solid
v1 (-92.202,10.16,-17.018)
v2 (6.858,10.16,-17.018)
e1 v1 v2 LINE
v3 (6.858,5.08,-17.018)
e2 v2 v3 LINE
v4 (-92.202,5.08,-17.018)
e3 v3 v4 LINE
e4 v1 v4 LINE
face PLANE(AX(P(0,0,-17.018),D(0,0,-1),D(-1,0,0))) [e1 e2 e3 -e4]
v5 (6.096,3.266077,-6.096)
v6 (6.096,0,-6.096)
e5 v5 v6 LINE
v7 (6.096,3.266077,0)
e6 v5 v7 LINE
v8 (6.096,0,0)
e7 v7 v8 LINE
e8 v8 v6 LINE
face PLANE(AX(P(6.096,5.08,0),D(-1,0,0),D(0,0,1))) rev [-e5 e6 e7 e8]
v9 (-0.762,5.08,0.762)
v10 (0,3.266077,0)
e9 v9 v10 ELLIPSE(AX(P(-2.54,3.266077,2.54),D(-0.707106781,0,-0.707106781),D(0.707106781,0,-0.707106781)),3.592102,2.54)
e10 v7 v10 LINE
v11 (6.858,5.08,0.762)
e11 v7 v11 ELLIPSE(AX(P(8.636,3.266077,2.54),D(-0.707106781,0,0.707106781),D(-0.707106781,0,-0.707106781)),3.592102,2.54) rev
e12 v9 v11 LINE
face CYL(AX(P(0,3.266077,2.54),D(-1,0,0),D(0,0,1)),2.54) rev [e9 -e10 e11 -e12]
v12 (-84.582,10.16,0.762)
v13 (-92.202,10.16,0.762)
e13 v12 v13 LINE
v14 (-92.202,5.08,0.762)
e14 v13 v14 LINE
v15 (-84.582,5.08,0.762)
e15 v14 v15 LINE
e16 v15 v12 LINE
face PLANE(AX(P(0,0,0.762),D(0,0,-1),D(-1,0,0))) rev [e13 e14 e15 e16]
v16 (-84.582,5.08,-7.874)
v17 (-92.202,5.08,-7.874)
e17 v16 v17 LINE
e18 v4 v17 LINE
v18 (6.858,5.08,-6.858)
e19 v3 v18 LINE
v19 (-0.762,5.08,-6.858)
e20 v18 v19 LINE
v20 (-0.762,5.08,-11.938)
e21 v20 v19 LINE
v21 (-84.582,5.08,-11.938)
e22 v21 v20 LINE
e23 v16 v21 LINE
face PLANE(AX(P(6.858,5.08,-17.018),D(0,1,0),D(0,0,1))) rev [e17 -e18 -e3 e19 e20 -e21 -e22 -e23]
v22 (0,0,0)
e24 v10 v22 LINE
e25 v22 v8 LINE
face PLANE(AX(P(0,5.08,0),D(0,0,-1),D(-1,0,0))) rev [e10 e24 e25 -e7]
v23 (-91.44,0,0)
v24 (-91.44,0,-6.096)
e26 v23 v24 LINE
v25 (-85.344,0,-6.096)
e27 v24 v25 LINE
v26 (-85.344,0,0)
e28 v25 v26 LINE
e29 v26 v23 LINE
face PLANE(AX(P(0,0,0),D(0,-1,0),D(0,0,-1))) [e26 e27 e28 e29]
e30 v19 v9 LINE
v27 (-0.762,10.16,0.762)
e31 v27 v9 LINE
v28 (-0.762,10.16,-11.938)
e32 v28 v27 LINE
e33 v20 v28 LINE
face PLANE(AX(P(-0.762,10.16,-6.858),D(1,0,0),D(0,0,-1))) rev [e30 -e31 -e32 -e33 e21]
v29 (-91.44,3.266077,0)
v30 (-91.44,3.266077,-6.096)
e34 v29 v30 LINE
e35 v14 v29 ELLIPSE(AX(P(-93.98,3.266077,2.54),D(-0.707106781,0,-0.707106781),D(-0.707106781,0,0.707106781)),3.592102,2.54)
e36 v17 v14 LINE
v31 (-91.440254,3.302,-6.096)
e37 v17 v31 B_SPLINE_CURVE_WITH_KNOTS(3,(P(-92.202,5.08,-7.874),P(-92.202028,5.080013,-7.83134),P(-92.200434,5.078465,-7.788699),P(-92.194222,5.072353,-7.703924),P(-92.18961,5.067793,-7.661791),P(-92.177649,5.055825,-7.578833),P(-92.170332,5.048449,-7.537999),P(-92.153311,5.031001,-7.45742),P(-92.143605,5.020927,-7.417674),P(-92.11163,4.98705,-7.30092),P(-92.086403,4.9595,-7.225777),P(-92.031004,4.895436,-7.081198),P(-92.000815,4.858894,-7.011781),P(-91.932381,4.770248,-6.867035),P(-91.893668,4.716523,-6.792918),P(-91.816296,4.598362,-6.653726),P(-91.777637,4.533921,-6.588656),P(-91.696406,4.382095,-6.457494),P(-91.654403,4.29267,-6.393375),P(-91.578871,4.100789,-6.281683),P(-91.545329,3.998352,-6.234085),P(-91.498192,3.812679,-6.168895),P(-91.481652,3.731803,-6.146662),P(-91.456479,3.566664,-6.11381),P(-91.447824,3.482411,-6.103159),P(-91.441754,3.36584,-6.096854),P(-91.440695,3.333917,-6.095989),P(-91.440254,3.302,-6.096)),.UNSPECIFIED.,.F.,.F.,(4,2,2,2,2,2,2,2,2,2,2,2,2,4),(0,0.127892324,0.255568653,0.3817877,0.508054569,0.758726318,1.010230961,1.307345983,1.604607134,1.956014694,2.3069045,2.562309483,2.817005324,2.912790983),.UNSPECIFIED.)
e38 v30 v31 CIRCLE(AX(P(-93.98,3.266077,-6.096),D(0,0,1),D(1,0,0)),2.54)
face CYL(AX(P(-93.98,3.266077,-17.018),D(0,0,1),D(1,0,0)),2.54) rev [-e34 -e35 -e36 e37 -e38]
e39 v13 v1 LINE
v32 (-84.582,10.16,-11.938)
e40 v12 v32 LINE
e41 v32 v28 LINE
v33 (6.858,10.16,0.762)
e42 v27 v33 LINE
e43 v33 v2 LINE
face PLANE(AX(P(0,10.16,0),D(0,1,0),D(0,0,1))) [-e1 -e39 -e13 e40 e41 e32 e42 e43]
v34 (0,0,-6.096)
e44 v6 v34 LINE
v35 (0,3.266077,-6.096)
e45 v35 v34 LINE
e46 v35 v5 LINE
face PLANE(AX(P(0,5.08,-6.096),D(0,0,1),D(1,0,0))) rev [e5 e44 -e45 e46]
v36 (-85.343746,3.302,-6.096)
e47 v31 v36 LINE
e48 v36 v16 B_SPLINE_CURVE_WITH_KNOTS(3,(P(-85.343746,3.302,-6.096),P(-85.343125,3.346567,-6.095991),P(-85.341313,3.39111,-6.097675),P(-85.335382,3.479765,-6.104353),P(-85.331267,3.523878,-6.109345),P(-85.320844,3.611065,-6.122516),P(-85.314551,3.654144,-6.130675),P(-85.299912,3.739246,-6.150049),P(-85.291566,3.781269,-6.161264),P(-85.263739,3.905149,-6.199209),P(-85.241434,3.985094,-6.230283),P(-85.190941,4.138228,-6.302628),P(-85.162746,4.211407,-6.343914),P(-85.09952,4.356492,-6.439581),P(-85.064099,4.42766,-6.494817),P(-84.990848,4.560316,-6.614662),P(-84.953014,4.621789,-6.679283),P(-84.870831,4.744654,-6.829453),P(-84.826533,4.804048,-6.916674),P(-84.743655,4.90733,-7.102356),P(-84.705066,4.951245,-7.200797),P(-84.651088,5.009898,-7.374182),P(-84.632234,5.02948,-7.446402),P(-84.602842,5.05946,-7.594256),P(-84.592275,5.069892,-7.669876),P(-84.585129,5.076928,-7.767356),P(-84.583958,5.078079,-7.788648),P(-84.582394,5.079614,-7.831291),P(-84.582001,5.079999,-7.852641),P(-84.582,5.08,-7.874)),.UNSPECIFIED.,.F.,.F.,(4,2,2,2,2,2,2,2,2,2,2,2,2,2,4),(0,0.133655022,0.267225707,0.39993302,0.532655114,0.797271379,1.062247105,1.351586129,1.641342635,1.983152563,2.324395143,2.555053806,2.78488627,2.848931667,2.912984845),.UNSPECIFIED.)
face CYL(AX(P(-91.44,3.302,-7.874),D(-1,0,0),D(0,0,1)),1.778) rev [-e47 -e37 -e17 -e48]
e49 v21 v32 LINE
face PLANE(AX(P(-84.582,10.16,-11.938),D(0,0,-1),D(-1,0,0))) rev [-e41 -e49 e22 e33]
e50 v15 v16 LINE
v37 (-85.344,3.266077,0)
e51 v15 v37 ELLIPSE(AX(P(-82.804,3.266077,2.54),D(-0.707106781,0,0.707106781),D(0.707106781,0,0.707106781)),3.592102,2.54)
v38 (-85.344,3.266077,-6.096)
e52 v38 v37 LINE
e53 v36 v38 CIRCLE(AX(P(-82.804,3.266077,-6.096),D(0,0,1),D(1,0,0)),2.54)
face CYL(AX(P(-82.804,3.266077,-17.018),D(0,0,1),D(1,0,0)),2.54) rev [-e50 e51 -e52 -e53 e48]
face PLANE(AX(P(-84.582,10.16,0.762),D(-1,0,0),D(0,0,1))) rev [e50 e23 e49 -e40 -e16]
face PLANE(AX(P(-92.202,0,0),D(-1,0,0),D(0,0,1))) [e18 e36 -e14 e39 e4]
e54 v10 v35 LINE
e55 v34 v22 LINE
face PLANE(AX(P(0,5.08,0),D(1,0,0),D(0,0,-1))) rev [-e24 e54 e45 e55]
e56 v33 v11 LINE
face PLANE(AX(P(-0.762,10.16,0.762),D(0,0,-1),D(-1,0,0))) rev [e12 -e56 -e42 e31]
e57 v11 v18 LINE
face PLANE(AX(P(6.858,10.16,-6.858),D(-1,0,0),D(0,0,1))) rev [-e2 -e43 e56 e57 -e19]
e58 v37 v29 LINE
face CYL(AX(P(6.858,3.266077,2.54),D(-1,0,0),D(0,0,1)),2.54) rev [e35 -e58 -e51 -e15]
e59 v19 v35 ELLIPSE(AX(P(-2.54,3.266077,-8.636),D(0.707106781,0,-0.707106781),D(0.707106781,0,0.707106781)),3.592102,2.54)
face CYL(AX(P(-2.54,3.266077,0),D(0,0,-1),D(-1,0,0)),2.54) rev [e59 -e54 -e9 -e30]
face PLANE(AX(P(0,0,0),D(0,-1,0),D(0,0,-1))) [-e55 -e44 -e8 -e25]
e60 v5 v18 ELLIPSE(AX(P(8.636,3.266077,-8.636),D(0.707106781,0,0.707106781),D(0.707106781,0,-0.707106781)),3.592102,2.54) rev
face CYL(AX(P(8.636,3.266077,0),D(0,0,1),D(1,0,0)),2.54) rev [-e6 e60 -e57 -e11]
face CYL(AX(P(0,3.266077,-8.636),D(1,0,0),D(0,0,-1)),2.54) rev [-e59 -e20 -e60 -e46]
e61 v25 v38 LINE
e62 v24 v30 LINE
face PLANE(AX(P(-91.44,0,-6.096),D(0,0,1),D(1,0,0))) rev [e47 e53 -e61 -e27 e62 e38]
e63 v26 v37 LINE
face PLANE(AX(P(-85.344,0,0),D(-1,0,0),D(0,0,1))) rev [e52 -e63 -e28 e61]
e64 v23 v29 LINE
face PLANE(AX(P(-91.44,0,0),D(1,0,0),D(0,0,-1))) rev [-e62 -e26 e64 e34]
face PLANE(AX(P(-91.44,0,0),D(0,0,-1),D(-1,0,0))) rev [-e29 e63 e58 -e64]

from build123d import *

# Parameters (mm, degrees)
SKETCH1_W           = 6.096
SKETCH1_H           = 6.096
BOSS_EXTRUDE1_DEPTH = 5.08
SKETCH2_W           = 7.62
SKETCH2_H           = 7.62
BOSS_EXTRUDE2_DEPTH = 5.08
FILLET1_R           = 2.54
SKETCH3_W           = 7.62
SKETCH3_H           = 5.08
BOSS_EXTRUDE3_DEPTH = 10.16
SKETCH4_W           = 5.08
SKETCH4_H           = 5.08
BOSS_EXTRUDE4_DEPTH = 83.82
SKETCH6_W           = 5.08
SKETCH6_H           = 5.08
BOSS_EXTRUDE5_DEPTH = 7.62
SKETCH8_W           = 7.62
SKETCH8_H           = 5.08
BOSS_EXTRUDE6_DEPTH = 12.7
SKETCH9_W           = 6.096
SKETCH9_H           = 6.096
BOSS_EXTRUDE7_DEPTH = 5.08
FILLET7_R           = 2.54
FILLET8_R           = 2.54
FILLET9_R           = 2.54
FILLET11_R          = 1.778


with BuildPart() as part:
    # Sketch1 → Boss-Extrude1 (new body)
    with BuildSketch(Plane(origin=(0, 0, 0), x_dir=(1, 0, 0), z_dir=(0, 1, 0))):
        with Locations((3.048, 3.048)):
            Rectangle(SKETCH1_W, SKETCH1_H)
    extrude(amount=BOSS_EXTRUDE1_DEPTH)

    # Sketch2 → Boss-Extrude2 (add)
    with BuildSketch(Plane(origin=(0, 5.08, 0), x_dir=(1, 0, 0), z_dir=(0, 1, 0))):
        with Locations((3.048, 3.048)):
            Rectangle(SKETCH2_W, SKETCH2_H)
    extrude(amount=BOSS_EXTRUDE2_DEPTH)

    # Fillet1
    # the kernel refuses this fillet: 2.54 mm, written as the material it adds along each edge
    with BuildSketch(Plane(origin=(6.096, 5.08, 0), x_dir=(1, 0, 0), z_dir=(0, 0, -1)), Plane(origin=(6.096, 5.08, -6.096), x_dir=(0, 0, -1), z_dir=(-1, 0, 0)), Plane(origin=(0, 5.08, -6.096), x_dir=(-1, 0, 0), z_dir=(0, 0, 1)), Plane(origin=(0, 5.08, 0), x_dir=(0, 0, 1), z_dir=(1, 0, 0))) as fillet1_piece_1:
        with BuildLine():
            CenterArc((2.54, 1.813922821), FILLET1_R, 180, 45.572995999)
            Line((0, 1.813922821), (-0.0508, 1.813922821))
            Line((-0.0508, 1.813922821), (-0.0508, 0))
            Line((-0.0508, 0), (0, -0.0508))
            ThreePointArc((0, -0.0508), (0.381, -0.0508), (0.72644, -0.036278456))
            Line((0.72644, -0.036278456), (0.762, 0))
        make_face()
    extrude(amount=6.096)
    with BuildSketch(Plane(origin=(6.096, 5.08, 4.534807052), x_dir=(1, 0, 0), z_dir=(0, 0, -1))) as fillet1_piece_2a_section:
        with BuildLine():
            CenterArc((2.54, 1.813922821), FILLET1_R, 180, 45.572995999)
            Line((0, 1.813922821), (-0.0508, 1.813922821))
            Line((-0.0508, 1.813922821), (-0.0508, 0))
            Line((-0.0508, 0), (0, -0.0508))
            ThreePointArc((0, -0.0508), (0.381, -0.0508), (0.72644, -0.036278456))
            Line((0.72644, -0.036278456), (0.762, 0))
        make_face()
    fillet1_piece_2a = extrude(amount=10.630807052, mode=Mode.PRIVATE)
    fillet1_piece_2a = split(fillet1_piece_2a, bisect_by=Plane(origin=(6.284412047, 4.594869389, 0.762), z_dir=(0, 0, -1)), keep=Keep.TOP, mode=Mode.PRIVATE)
    fillet1_piece_2a = split(fillet1_piece_2a, bisect_by=Plane(origin=(6.284412047, 4.594869389, 0), z_dir=(0, 0, 1)), keep=Keep.TOP, mode=Mode.PRIVATE)
    with BuildSketch(Plane(origin=(0, 5.08, 0), x_dir=(0, 0, 1), z_dir=(1, 0, 0))) as fillet1_piece_2b_section:
        with BuildLine():
            CenterArc((2.54, 1.813922821), FILLET1_R, 180, 45.572995999)
            Line((0, 1.813922821), (-0.0508, 1.813922821))
            Line((-0.0508, 1.813922821), (-0.0508, 0))
            Line((-0.0508, 0), (0, -0.0508))
            ThreePointArc((0, -0.0508), (0.381, -0.0508), (0.72644, -0.036278456))
            Line((0.72644, -0.036278456), (0.762, 0))
        make_face()
    fillet1_piece_2b = extrude(amount=10.630807052, mode=Mode.PRIVATE)
    fillet1_piece_2b = split(fillet1_piece_2b, bisect_by=Plane(origin=(6.858, 4.594869389, 0.188412047), z_dir=(-1, 0, 0)), keep=Keep.TOP, mode=Mode.PRIVATE)
    fillet1_piece_2b = split(fillet1_piece_2b, bisect_by=Plane(origin=(6.096, 4.594869389, 0.188412047), z_dir=(1, 0, 0)), keep=Keep.TOP, mode=Mode.PRIVATE)
    fillet1_piece_2 = fillet1_piece_2a & fillet1_piece_2b
    add(fillet1_piece_2)
    with BuildSketch(Plane(origin=(10.630807052, 5.08, -6.096), x_dir=(0, 0, -1), z_dir=(-1, 0, 0))) as fillet1_piece_3a_section:
        with BuildLine():
            CenterArc((2.54, 1.813922821), FILLET1_R, 180, 45.572995999)
            Line((0, 1.813922821), (-0.0508, 1.813922821))
            Line((-0.0508, 1.813922821), (-0.0508, 0))
            Line((-0.0508, 0), (0, -0.0508))
            ThreePointArc((0, -0.0508), (0.381, -0.0508), (0.72644, -0.036278456))
            Line((0.72644, -0.036278456), (0.762, 0))
        make_face()
    fillet1_piece_3a = extrude(amount=10.630807052, mode=Mode.PRIVATE)
    fillet1_piece_3a = split(fillet1_piece_3a, bisect_by=Plane(origin=(6.858, 4.594869389, -6.284412047), z_dir=(-1, 0, 0)), keep=Keep.TOP, mode=Mode.PRIVATE)
    fillet1_piece_3a = split(fillet1_piece_3a, bisect_by=Plane(origin=(6.096, 4.594869389, -6.284412047), z_dir=(1, 0, 0)), keep=Keep.TOP, mode=Mode.PRIVATE)
    with BuildSketch(Plane(origin=(6.096, 5.08, 0), x_dir=(1, 0, 0), z_dir=(0, 0, -1))) as fillet1_piece_3b_section:
        with BuildLine():
            CenterArc((2.54, 1.813922821), FILLET1_R, 180, 45.572995999)
            Line((0, 1.813922821), (-0.0508, 1.813922821))
            Line((-0.0508, 1.813922821), (-0.0508, 0))
            Line((-0.0508, 0), (0, -0.0508))
            ThreePointArc((0, -0.0508), (0.381, -0.0508), (0.72644, -0.036278456))
            Line((0.72644, -0.036278456), (0.762, 0))
        make_face()
    fillet1_piece_3b = extrude(amount=10.630807052, mode=Mode.PRIVATE)
    fillet1_piece_3b = split(fillet1_piece_3b, bisect_by=Plane(origin=(6.284412047, 4.594869389, -6.858), z_dir=(0, 0, 1)), keep=Keep.TOP, mode=Mode.PRIVATE)
    fillet1_piece_3b = split(fillet1_piece_3b, bisect_by=Plane(origin=(6.284412047, 4.594869389, -6.096), z_dir=(0, 0, -1)), keep=Keep.TOP, mode=Mode.PRIVATE)
    fillet1_piece_3 = fillet1_piece_3a & fillet1_piece_3b
    add(fillet1_piece_3)
    with BuildSketch(Plane(origin=(0, 5.08, -10.630807052), x_dir=(-1, 0, 0), z_dir=(0, 0, 1))) as fillet1_piece_4a_section:
        with BuildLine():
            CenterArc((2.54, 1.813922821), FILLET1_R, 180, 45.572995999)
            Line((0, 1.813922821), (-0.0508, 1.813922821))
            Line((-0.0508, 1.813922821), (-0.0508, 0))
            Line((-0.0508, 0), (0, -0.0508))
            ThreePointArc((0, -0.0508), (0.381, -0.0508), (0.72644, -0.036278456))
            Line((0.72644, -0.036278456), (0.762, 0))
        make_face()
    fillet1_piece_4a = extrude(amount=10.630807052, mode=Mode.PRIVATE)
    fillet1_piece_4a = split(fillet1_piece_4a, bisect_by=Plane(origin=(-0.188412047, 4.594869389, -6.858), z_dir=(0, 0, 1)), keep=Keep.TOP, mode=Mode.PRIVATE)
    fillet1_piece_4a = split(fillet1_piece_4a, bisect_by=Plane(origin=(-0.188412047, 4.594869389, -6.096), z_dir=(0, 0, -1)), keep=Keep.TOP, mode=Mode.PRIVATE)
    with BuildSketch(Plane(origin=(6.096, 5.08, -6.096), x_dir=(0, 0, -1), z_dir=(-1, 0, 0))) as fillet1_piece_4b_section:
        with BuildLine():
            CenterArc((2.54, 1.813922821), FILLET1_R, 180, 45.572995999)
            Line((0, 1.813922821), (-0.0508, 1.813922821))
            Line((-0.0508, 1.813922821), (-0.0508, 0))
            Line((-0.0508, 0), (0, -0.0508))
            ThreePointArc((0, -0.0508), (0.381, -0.0508), (0.72644, -0.036278456))
            Line((0.72644, -0.036278456), (0.762, 0))
        make_face()
    fillet1_piece_4b = extrude(amount=10.630807052, mode=Mode.PRIVATE)
    fillet1_piece_4b = split(fillet1_piece_4b, bisect_by=Plane(origin=(-0.762, 4.594869389, -6.284412047), z_dir=(1, 0, 0)), keep=Keep.TOP, mode=Mode.PRIVATE)
    fillet1_piece_4b = split(fillet1_piece_4b, bisect_by=Plane(origin=(0, 4.594869389, -6.284412047), z_dir=(-1, 0, 0)), keep=Keep.TOP, mode=Mode.PRIVATE)
    fillet1_piece_4 = fillet1_piece_4a & fillet1_piece_4b
    add(fillet1_piece_4)
    with BuildSketch(Plane(origin=(0, 5.08, -6.096), x_dir=(-1, 0, 0), z_dir=(0, 0, 1))) as fillet1_piece_5a_section:
        with BuildLine():
            CenterArc((2.54, 1.813922821), FILLET1_R, 180, 45.572995999)
            Line((0, 1.813922821), (-0.0508, 1.813922821))
            Line((-0.0508, 1.813922821), (-0.0508, 0))
            Line((-0.0508, 0), (0, -0.0508))
            ThreePointArc((0, -0.0508), (0.381, -0.0508), (0.72644, -0.036278456))
            Line((0.72644, -0.036278456), (0.762, 0))
        make_face()
    fillet1_piece_5a = extrude(amount=10.630807052, mode=Mode.PRIVATE)
    fillet1_piece_5a = split(fillet1_piece_5a, bisect_by=Plane(origin=(-0.188412047, 4.594869389, 0.762), z_dir=(0, 0, -1)), keep=Keep.TOP, mode=Mode.PRIVATE)
    fillet1_piece_5a = split(fillet1_piece_5a, bisect_by=Plane(origin=(-0.188412047, 4.594869389, 0), z_dir=(0, 0, 1)), keep=Keep.TOP, mode=Mode.PRIVATE)
    with BuildSketch(Plane(origin=(-4.534807052, 5.08, 0), x_dir=(0, 0, 1), z_dir=(1, 0, 0))) as fillet1_piece_5b_section:
        with BuildLine():
            CenterArc((2.54, 1.813922821), FILLET1_R, 180, 45.572995999)
            Line((0, 1.813922821), (-0.0508, 1.813922821))
            Line((-0.0508, 1.813922821), (-0.0508, 0))
            Line((-0.0508, 0), (0, -0.0508))
            ThreePointArc((0, -0.0508), (0.381, -0.0508), (0.72644, -0.036278456))
            Line((0.72644, -0.036278456), (0.762, 0))
        make_face()
    fillet1_piece_5b = extrude(amount=10.630807052, mode=Mode.PRIVATE)
    fillet1_piece_5b = split(fillet1_piece_5b, bisect_by=Plane(origin=(-0.762, 4.594869389, 0.188412047), z_dir=(1, 0, 0)), keep=Keep.TOP, mode=Mode.PRIVATE)
    fillet1_piece_5b = split(fillet1_piece_5b, bisect_by=Plane(origin=(0, 4.594869389, 0.188412047), z_dir=(-1, 0, 0)), keep=Keep.TOP, mode=Mode.PRIVATE)
    fillet1_piece_5 = fillet1_piece_5a & fillet1_piece_5b
    add(fillet1_piece_5)

    # Sketch3 → Boss-Extrude3 (add)
    with BuildSketch(Plane(origin=(0, 0, -6.858), x_dir=(-1, 0, 0), z_dir=(0, 0, -1))):
        with Locations((-3.048, 7.62)):
            Rectangle(SKETCH3_W, SKETCH3_H)
    extrude(amount=BOSS_EXTRUDE3_DEPTH)

    # Sketch4 → Boss-Extrude4 (add)
    with BuildSketch(Plane.ZY.offset(0.762)):
        with Locations((-14.478, 7.62)):
            Rectangle(SKETCH4_W, SKETCH4_H)
    extrude(amount=BOSS_EXTRUDE4_DEPTH)

    # Sketch6 → Boss-Extrude5 (add)
    with BuildSketch(Plane.ZY.offset(84.582)):
        with Locations((-14.478, 7.62)):
            Rectangle(SKETCH6_W, SKETCH6_H)
    extrude(amount=BOSS_EXTRUDE5_DEPTH)

    # Sketch8 → Boss-Extrude6 (add)
    with BuildSketch(Plane.XY.offset(-11.938)):
        with Locations((-88.392, 7.62)):
            Rectangle(SKETCH8_W, SKETCH8_H)
    extrude(amount=BOSS_EXTRUDE6_DEPTH)

    # Sketch9 → Boss-Extrude7 (add)
    with BuildSketch(Plane.XZ.offset(-5.08)):
        with Locations((-88.392, -3.048)):
            Rectangle(SKETCH9_W, SKETCH9_H)
    extrude(amount=BOSS_EXTRUDE7_DEPTH)

    # Fillet7
    # the kernel refuses this fillet: 2.54 mm, written as the material it adds along each edge
    with BuildSketch(Plane(origin=(-85.344, 5.08, 0), x_dir=(1, 0, 0), z_dir=(0, 0, -1))) as fillet7_piece_1:
        with BuildLine():
            CenterArc((2.54, 1.813922821), FILLET7_R, 180, 45.572995999)
            Line((0, 1.813922821), (-0.0508, 1.813922821))
            Line((-0.0508, 1.813922821), (-0.0508, 0))
            Line((-0.0508, 0), (0, -0.0508))
            ThreePointArc((0, -0.0508), (0.381, -0.0508), (0.72644, -0.036278456))
            Line((0.72644, -0.036278456), (0.762, 0))
        make_face()
    extrude(amount=6.096)

    # Fillet8
    # the kernel refuses this fillet: 2.54 mm, written as the material it adds along each edge
    with BuildSketch(Plane(origin=(-84.582, 5.08, 0), x_dir=(0, 0, 1), z_dir=(-1, 0, 0))) as fillet8_piece_1_section:
        with BuildLine():
            CenterArc((2.54, -1.813922821), FILLET8_R, 134.427004001, 45.572995999)
            Line((0, -1.813922821), (-0.0508, -1.813922821))
            Line((-0.0508, -1.813922821), (-0.0508, 0))
            Line((-0.0508, 0), (0, 0.0508))
            ThreePointArc((0, 0.0508), (0.381, 0.0508), (0.72644, 0.036278456))
            Line((0.72644, 0.036278456), (0.762, 0))
        make_face()
    fillet8_piece_1 = extrude(amount=6.858, mode=Mode.PRIVATE)
    fillet8_piece_1 = fillet8_piece_1 - Plane(origin=(-82.804, 3.266077179, 0.249051063), x_dir=(1, 0, 0), z_dir=(0, 0, 1)) * Cylinder(2.54, 21, mode=Mode.PRIVATE)
    add(fillet8_piece_1)

    # Fillet9
    # the kernel refuses this fillet: 2.54 mm, written as the material it adds along each edge
    with BuildSketch(Plane(origin=(-91.44, 5.08, 0.762), x_dir=(-1, 0, 0), z_dir=(0, 0, -1))) as fillet9_piece_1_section:
        with BuildLine():
            CenterArc((2.54, -1.813922821), FILLET9_R, 134.427004001, 45.572995999)
            Line((0, -1.813922821), (-0.0508, -1.813922821))
            Line((-0.0508, -1.813922821), (-0.0508, 0))
            Line((-0.0508, 0), (0, 0.0508))
            ThreePointArc((0, 0.0508), (0.381, 0.0508), (0.72644, 0.036278456))
            Line((0.72644, 0.036278456), (0.762, 0))
        make_face()
    fillet9_piece_1 = extrude(amount=6.858, mode=Mode.PRIVATE)
    fillet9_piece_1 = fillet9_piece_1 - Plane(origin=(-91.689051063, 3.266077179, 2.54), x_dir=(0, 0, 1), z_dir=(1, 0, 0)) * Cylinder(2.54, 21, mode=Mode.PRIVATE)
    add(fillet9_piece_1)

    # Fillet11
    # the kernel refuses this fillet: 1.778 mm, written as the material it adds along each edge
    with BuildSketch(Plane(origin=(-92.202, 5.08, -6.096), x_dir=(0, 0, -1), z_dir=(1, 0, 0))) as fillet11_piece_1_section:
        with BuildLine():
            CenterArc((FILLET11_R, -FILLET11_R), FILLET11_R, 90, 90)
            Line((0, -FILLET11_R), (0, 0))
            Line((0, 0), (FILLET11_R, 0))
        make_face()
    fillet11_piece_1 = extrude(amount=7.62, mode=Mode.PRIVATE)
    fillet11_piece_1 = fillet11_piece_1 - Plane(origin=(-93.98, 3.266077179, -6.513594947), x_dir=(-1, 0, 0), z_dir=(0, 0, 1)) * Cylinder(2.54, 23, mode=Mode.PRIVATE)
    fillet11_piece_1 = fillet11_piece_1 - Plane(origin=(-82.804, 3.266077179, -6.513594947), x_dir=(1, 0, 0), z_dir=(0, 0, 1)) * Cylinder(2.54, 23, mode=Mode.PRIVATE)
    add(fillet11_piece_1)


solid = part.part
